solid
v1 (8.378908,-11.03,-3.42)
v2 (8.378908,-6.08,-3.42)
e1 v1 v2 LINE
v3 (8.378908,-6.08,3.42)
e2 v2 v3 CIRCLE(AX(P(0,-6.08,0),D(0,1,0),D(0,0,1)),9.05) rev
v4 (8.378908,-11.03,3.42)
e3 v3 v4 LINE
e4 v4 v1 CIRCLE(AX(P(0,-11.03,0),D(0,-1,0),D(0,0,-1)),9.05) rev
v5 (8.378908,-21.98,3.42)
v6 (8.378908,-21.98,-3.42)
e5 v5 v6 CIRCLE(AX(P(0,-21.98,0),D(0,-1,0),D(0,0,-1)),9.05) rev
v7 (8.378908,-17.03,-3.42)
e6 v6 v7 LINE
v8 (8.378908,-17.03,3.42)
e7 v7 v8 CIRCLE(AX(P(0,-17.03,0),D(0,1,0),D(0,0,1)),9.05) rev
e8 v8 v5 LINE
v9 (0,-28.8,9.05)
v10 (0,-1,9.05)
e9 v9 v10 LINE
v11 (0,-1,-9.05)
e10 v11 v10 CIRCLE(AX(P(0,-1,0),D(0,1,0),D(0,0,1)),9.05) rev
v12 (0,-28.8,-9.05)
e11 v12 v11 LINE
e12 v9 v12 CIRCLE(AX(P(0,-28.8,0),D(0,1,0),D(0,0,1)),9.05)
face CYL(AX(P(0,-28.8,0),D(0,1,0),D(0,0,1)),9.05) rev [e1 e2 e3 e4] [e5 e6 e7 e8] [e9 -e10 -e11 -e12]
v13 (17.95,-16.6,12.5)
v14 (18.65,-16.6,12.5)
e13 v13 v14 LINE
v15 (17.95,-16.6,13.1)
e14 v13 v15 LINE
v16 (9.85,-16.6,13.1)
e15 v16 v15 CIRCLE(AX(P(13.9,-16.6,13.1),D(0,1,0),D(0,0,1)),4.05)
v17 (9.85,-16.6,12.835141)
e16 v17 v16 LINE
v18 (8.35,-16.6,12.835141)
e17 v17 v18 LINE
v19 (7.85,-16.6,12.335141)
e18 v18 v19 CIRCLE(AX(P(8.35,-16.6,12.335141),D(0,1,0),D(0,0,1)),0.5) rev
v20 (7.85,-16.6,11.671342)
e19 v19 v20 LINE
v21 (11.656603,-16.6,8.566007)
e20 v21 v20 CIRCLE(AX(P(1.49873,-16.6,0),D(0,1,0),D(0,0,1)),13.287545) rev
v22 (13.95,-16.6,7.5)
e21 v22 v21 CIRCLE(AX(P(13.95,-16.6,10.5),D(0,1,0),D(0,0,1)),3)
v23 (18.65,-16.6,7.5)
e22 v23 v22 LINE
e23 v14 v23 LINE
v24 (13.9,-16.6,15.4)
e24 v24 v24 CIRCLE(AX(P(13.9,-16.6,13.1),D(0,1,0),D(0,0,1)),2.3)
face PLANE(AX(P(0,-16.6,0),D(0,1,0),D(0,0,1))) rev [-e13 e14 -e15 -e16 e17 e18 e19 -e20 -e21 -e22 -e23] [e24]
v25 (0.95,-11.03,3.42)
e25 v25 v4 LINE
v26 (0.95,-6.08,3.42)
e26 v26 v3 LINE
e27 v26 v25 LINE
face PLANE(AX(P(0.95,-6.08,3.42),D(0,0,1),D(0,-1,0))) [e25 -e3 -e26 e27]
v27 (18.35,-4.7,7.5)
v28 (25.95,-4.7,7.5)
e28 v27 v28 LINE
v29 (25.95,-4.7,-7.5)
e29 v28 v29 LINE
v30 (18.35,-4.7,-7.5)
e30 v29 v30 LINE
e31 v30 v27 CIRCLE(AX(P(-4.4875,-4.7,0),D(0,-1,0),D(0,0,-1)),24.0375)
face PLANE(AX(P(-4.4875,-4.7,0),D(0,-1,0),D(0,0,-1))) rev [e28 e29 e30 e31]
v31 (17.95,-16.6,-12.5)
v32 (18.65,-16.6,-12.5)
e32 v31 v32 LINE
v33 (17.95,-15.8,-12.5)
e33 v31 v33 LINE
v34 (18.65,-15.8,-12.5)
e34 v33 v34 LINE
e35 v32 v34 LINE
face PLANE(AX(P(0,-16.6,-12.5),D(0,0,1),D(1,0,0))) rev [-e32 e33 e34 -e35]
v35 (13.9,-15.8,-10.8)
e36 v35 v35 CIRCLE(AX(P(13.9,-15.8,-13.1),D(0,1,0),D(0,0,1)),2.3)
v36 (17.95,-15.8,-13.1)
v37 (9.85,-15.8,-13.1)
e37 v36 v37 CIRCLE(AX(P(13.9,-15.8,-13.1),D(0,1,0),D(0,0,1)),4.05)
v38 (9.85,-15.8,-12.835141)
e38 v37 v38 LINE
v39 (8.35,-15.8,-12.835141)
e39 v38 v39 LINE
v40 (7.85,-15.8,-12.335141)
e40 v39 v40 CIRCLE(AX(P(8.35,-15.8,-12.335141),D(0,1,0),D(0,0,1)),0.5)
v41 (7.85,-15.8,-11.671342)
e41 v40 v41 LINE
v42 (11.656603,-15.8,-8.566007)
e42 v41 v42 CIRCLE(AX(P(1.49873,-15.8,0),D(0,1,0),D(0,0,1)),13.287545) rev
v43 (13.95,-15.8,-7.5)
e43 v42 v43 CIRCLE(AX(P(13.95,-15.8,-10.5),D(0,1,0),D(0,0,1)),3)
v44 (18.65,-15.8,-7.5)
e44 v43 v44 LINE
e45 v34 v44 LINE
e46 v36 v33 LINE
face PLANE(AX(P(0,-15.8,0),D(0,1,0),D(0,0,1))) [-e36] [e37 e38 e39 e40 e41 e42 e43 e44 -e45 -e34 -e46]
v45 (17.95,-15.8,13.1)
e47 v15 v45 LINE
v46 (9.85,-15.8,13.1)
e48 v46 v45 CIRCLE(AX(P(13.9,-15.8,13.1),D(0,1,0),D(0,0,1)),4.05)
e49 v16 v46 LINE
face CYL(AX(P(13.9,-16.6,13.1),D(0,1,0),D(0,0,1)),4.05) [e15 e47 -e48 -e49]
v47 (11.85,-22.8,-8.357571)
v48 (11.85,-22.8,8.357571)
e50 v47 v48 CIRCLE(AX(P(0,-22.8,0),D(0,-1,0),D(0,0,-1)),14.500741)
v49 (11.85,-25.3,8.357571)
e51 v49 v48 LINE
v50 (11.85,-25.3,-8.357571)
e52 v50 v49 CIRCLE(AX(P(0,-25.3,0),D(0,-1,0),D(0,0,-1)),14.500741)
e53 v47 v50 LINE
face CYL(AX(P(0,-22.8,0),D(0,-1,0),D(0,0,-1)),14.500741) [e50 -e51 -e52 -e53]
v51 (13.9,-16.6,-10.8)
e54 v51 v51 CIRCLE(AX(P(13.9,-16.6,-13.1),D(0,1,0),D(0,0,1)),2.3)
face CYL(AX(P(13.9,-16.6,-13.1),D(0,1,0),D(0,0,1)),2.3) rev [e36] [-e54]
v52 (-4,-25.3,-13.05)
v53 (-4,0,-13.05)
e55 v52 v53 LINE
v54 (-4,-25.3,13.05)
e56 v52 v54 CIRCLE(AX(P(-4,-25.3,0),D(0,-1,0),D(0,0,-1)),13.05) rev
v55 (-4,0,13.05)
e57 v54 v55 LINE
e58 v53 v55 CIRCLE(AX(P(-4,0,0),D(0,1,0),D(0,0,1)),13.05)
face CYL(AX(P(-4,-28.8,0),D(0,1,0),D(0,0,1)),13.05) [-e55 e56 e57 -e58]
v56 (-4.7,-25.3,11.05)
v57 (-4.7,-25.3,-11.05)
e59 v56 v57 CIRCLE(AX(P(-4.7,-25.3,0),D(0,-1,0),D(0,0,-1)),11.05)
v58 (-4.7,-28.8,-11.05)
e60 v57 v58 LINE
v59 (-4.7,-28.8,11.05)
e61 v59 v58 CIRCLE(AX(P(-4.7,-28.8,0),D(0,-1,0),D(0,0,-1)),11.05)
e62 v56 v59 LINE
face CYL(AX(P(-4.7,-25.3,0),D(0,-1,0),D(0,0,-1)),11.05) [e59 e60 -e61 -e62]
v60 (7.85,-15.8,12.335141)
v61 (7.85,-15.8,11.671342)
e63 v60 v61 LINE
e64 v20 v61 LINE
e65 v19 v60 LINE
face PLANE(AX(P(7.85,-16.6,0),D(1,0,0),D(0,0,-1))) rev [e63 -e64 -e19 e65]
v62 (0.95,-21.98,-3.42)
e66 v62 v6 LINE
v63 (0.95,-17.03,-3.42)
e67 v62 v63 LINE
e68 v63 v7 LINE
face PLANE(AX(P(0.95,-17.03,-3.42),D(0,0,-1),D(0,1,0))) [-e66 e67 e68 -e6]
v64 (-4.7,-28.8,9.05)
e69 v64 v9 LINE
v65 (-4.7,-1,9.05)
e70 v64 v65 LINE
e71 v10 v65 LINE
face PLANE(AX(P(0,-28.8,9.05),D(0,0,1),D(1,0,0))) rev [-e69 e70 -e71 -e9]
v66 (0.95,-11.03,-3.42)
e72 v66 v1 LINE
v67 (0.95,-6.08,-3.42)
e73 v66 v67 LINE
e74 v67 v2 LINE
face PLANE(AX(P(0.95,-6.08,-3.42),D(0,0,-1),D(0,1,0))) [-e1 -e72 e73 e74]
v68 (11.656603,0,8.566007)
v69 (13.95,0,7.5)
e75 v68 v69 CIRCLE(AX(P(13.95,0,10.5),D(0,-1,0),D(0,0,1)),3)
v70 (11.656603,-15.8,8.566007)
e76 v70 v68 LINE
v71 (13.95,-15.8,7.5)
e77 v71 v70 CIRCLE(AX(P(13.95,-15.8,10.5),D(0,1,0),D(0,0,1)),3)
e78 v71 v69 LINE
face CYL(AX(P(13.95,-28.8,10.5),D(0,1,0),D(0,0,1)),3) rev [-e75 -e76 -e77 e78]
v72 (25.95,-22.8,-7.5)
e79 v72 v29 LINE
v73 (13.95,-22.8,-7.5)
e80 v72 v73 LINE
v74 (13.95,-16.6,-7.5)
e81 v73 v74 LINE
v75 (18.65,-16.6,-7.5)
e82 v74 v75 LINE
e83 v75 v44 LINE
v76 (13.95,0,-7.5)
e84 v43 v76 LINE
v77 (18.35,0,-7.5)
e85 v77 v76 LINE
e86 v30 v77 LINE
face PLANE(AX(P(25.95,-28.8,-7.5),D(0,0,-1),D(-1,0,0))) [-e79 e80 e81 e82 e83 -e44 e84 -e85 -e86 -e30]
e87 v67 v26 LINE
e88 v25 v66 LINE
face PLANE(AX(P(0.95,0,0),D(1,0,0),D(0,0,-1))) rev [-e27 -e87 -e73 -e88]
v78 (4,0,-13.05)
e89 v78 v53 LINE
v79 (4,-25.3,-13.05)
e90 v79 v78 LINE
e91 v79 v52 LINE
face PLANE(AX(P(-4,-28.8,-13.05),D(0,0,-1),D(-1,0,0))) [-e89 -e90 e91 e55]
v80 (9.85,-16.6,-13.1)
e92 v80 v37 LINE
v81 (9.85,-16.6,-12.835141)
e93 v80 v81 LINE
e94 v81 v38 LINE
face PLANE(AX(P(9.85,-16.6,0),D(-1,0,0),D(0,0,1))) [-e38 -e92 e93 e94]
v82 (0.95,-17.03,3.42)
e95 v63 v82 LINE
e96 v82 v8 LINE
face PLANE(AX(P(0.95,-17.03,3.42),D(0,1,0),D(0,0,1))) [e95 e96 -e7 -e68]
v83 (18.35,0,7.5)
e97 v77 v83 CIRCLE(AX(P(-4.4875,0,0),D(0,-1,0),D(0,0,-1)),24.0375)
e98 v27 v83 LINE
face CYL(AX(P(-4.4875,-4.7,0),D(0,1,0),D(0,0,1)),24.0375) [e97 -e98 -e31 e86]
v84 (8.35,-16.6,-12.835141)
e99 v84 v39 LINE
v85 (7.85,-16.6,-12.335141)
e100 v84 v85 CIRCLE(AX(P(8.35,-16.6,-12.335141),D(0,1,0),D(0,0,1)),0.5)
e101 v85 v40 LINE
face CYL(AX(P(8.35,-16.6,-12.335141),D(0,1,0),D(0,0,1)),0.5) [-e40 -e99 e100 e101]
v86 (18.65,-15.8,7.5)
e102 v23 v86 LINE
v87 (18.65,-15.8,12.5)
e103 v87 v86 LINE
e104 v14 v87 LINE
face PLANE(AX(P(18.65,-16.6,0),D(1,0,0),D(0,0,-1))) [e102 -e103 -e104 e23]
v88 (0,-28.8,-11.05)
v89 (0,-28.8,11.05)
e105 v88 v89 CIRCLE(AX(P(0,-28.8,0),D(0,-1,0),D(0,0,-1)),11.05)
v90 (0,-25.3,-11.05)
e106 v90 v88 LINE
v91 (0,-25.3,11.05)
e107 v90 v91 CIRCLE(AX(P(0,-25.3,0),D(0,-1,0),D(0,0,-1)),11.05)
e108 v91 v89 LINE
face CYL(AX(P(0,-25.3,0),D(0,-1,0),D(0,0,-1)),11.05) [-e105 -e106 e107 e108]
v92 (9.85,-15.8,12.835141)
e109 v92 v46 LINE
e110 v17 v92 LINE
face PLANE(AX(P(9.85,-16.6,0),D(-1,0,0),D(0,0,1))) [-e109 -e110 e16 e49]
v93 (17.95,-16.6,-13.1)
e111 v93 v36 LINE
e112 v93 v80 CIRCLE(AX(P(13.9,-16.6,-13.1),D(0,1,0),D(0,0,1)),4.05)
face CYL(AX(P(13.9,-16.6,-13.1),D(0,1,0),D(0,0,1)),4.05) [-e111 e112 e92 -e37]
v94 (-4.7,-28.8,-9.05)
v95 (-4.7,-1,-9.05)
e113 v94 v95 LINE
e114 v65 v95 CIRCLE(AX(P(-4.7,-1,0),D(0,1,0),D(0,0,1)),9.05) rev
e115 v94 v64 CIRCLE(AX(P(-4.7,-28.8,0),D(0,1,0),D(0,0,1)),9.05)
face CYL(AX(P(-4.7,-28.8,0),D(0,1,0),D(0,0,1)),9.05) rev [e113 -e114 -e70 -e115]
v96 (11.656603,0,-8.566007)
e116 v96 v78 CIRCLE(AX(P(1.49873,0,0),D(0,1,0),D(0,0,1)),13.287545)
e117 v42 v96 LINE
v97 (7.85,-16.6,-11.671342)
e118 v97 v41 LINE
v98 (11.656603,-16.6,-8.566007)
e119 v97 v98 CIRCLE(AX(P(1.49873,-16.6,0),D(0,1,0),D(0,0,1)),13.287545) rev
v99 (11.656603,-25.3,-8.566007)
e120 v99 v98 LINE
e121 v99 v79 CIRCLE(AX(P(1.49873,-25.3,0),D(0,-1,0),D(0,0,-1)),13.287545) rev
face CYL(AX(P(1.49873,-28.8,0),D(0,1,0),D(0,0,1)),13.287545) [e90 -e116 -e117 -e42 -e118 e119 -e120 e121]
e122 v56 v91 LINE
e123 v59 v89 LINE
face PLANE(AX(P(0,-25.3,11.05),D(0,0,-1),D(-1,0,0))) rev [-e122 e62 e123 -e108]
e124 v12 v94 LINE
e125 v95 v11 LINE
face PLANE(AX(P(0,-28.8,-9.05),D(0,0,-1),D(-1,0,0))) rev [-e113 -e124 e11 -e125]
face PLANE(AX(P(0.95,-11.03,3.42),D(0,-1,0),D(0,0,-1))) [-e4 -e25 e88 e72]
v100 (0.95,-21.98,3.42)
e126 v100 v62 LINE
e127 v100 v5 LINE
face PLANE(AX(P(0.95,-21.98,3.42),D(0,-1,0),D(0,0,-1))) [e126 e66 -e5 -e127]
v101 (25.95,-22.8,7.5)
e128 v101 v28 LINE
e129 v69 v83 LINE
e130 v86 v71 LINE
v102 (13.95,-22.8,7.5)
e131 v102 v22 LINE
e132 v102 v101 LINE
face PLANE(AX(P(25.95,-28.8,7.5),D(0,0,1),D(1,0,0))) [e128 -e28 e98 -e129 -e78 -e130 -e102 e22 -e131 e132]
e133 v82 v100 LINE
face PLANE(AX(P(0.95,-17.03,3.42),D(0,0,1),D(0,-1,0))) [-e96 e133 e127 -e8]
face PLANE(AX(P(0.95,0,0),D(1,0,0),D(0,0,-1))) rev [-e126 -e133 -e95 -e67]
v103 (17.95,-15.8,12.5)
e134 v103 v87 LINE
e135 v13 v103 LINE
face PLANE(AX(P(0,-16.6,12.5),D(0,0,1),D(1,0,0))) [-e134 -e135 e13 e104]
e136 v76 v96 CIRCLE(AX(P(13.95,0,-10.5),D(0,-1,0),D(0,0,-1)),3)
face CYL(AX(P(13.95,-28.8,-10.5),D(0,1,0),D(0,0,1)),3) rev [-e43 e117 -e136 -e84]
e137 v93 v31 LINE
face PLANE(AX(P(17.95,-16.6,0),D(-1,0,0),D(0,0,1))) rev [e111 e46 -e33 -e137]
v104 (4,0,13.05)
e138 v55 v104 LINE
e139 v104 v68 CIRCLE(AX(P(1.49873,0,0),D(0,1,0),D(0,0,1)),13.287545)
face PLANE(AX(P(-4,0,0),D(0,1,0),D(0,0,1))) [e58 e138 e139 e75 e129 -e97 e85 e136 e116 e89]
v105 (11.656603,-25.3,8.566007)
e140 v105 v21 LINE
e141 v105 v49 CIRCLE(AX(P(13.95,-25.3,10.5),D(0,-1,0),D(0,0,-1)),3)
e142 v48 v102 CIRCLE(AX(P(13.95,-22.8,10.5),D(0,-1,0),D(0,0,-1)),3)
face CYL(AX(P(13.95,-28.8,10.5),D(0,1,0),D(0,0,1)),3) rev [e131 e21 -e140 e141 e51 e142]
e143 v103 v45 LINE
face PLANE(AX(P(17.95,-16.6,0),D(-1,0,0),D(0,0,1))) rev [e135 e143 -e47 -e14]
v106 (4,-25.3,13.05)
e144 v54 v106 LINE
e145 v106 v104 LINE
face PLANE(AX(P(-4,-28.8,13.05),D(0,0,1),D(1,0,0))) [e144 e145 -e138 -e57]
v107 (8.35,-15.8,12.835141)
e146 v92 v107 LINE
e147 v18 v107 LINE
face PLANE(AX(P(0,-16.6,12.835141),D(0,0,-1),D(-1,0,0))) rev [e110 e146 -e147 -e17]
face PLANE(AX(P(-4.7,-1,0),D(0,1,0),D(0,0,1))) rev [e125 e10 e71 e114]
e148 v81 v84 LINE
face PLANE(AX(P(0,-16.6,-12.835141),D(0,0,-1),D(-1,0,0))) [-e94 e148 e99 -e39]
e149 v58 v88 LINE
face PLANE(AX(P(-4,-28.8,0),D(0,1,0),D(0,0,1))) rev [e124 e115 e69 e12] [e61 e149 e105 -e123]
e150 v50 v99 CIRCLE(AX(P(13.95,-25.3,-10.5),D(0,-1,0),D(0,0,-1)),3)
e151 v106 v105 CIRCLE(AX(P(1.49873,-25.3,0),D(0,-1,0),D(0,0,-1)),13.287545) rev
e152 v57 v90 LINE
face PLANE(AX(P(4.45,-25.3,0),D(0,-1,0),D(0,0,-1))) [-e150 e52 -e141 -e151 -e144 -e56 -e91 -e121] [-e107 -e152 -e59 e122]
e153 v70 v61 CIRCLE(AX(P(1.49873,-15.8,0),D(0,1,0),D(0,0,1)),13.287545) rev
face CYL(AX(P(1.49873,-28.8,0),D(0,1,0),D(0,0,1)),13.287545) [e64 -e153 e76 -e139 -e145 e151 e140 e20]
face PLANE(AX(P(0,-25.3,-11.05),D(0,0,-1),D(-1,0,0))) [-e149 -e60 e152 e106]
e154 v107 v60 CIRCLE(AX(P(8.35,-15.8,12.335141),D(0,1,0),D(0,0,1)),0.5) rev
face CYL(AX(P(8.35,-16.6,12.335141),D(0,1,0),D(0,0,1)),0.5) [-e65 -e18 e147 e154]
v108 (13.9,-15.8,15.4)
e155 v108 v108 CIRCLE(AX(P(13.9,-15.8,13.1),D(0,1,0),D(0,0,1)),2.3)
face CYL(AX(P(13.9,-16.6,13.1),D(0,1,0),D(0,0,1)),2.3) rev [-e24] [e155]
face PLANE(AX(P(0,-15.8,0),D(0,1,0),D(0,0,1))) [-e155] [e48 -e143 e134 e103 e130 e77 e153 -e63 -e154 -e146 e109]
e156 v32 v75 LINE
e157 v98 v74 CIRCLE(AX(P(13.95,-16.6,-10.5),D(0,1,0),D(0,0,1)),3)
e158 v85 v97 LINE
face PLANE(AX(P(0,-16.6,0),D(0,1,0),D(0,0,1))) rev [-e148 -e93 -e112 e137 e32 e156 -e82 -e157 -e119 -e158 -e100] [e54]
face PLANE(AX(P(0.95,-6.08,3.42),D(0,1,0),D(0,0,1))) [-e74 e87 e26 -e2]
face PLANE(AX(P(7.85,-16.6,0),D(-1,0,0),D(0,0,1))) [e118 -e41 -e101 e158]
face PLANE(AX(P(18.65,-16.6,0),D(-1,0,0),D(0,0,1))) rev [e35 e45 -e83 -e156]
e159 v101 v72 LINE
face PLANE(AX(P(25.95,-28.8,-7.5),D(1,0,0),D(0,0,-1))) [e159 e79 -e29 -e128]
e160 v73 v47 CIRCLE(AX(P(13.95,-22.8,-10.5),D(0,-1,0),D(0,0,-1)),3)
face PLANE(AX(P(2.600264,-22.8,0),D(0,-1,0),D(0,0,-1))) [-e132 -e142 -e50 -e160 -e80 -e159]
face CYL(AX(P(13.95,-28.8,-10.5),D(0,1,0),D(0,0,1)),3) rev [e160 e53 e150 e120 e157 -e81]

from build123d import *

# Parameters (mm, degrees)
BOSS_EXTRUDE1_DEPTH = 28.8
CUT_EXTRUDE1_DEPTH  = 41.90409515
BOSS_EXTRUDE3_DEPTH = 1
CUT_EXTRUDE2_DEPTH  = 4.7
SKETCH4_R           = 2.3
BOSS_EXTRUDE2_DEPTH = 0.8
SKETCH5_OUTSIDE_W   = 57.418
SKETCH5_OUTSIDE_H   = 48.718
CUT_EXTRUDE3_DEPTH  = 3.5
SKETCH6_OUTSIDE_W   = 57.418
SKETCH6_OUTSIDE_H   = 48.718
CUT_EXTRUDE4_DEPTH  = 2.5
SKETCH8_W           = 6.84
SKETCH8_H           = 4.95
BOSS_EXTRUDE4_DEPTH = 25


with BuildPart() as part:
    # Sketch1 → Boss-Extrude1 (new body)
    with BuildSketch(Plane(origin=(0, 0, 0), x_dir=(1, 0, 0), z_dir=(0, 1, 0))):
        with BuildLine():
            Line((-4, 13.05), (4, 13.05))
            ThreePointArc((4, 13.05), (8.213640499, 11.465985784), (11.656602829, 8.566006872))
            ThreePointArc((11.656602829, 8.566006872), (12.685480206, 7.779523995), (13.95, 7.5))
            Line((13.95, 7.5), (25.95, 7.5))
            Line((25.95, 7.5), (25.95, -7.5))
            Line((25.95, -7.5), (13.95, -7.5))
            ThreePointArc((13.95, -7.5), (12.685480206, -7.779523995), (11.656602829, -8.566006872))
            ThreePointArc((11.656602829, -8.566006872), (8.213640499, -11.465985784), (4, -13.05))
            Line((4, -13.05), (-4, -13.05))
            ThreePointArc((-4, -13.05), (-17.05, 0), (-4, 13.05))
        make_face()
    extrude(amount=-BOSS_EXTRUDE1_DEPTH)

    # Sketch2 → Cut-Extrude1 (cut, through all)
    with BuildSketch(Plane(origin=(0, 0, 0), x_dir=(1, 0, 0), z_dir=(0, 1, 0))):
        with BuildLine():
            Line((0, -9.05), (-4.7, -9.05))
            ThreePointArc((-4.7, -9.05), (-13.75, 0), (-4.7, 9.05))
            Line((-4.7, 9.05), (0, 9.05))
            ThreePointArc((0, 9.05), (9.05, 0), (0, -9.05))
        make_face()
    extrude(amount=-CUT_EXTRUDE1_DEPTH, mode=Mode.SUBTRACT)

    # Sketch7 → Boss-Extrude3 (add)
    with BuildSketch(Plane(origin=(0, 0, 0), x_dir=(1, 0, 0), z_dir=(0, 1, 0))):
        with BuildLine():
            Line((-4.7, 10.05), (0, 10.05))
            ThreePointArc((0, 10.05), (10.05, 0), (0, -10.05))
            Line((0, -10.05), (-4.7, -10.05))
            ThreePointArc((-4.7, -10.05), (-14.75, 0), (-4.7, 10.05))
        make_face()
    extrude(amount=-BOSS_EXTRUDE3_DEPTH)

    # Sketch3 → Cut-Extrude2 (cut)
    with BuildSketch(Plane(origin=(0, 0, 0), x_dir=(1, 0, 0), z_dir=(0, 1, 0))):
        with BuildLine():
            Line((25.95, 7.5), (18.35, 7.5))
            ThreePointArc((18.35, 7.5), (19.55, 0), (18.35, -7.5))
            Line((18.35, -7.5), (25.95, -7.5))
            Line((25.95, -7.5), (25.95, 7.5))
        make_face()
    extrude(amount=-CUT_EXTRUDE2_DEPTH, mode=Mode.SUBTRACT)

    # Sketch4 → Boss-Extrude2 (add)
    with BuildSketch(Plane(origin=(0, -15.8, 0), x_dir=(1, 0, 0), z_dir=(0, 1, 0))):
        with BuildLine():
            Line((17.95, 12.5), (17.95, 13.1))
            ThreePointArc((17.95, 13.1), (13.9, 17.15), (9.85, 13.1))
            Line((9.85, 13.1), (9.85, 12.835141167))
            Line((9.85, 12.835141167), (8.35, 12.835141167))
            ThreePointArc((8.35, 12.835141167), (7.996446609, 12.688694558), (7.85, 12.335141167))
            Line((7.85, 12.335141167), (7.85, 10.106704765))
            Line((7.85, 10.106704765), (9.85, 10.106704765))
            Line((9.85, 10.106704765), (9.85, -10.106704765))
            Line((9.85, -10.106704765), (7.85, -10.106704765))
            Line((7.85, -10.106704765), (7.85, -12.335141167))
            ThreePointArc((7.85, -12.335141167), (7.996446609, -12.688694558), (8.35, -12.835141167))
            Line((8.35, -12.835141167), (9.85, -12.835141167))
            Line((9.85, -12.835141167), (9.85, -13.1))
            ThreePointArc((9.85, -13.1), (13.9, -17.15), (17.95, -13.1))
            Line((17.95, -13.1), (17.95, -12.5))
            Line((17.95, -12.5), (18.65, -12.5))
            Line((18.65, -12.5), (18.65, -6.668963251))
            Line((18.65, -6.668963251), (17.95, -6.668963251))
            Line((17.95, -6.668963251), (17.95, 6.668963251))
            Line((17.95, 6.668963251), (18.65, 6.668963251))
            Line((18.65, 6.668963251), (18.65, 12.5))
            Line((18.65, 12.5), (17.95, 12.5))
        make_face()
        with Locations((13.9, -13.1)):
            Circle(SKETCH4_R, mode=Mode.SUBTRACT)
        with Locations((13.9, 13.1)):
            Circle(SKETCH4_R, mode=Mode.SUBTRACT)
    extrude(amount=-BOSS_EXTRUDE2_DEPTH)

    # Sketch5 outside → Cut-Extrude3 (cut)
    # profile 1 of 2: a face of its own
    with BuildSketch(Plane.XZ.offset(28.8)):
        with Locations((4.45, 0)):
            Rectangle(SKETCH5_OUTSIDE_W, SKETCH5_OUTSIDE_H)
        with BuildLine():
            Line((0, 11.05), (-4.7, 11.05))
            ThreePointArc((-4.7, 11.05), (-15.75, 0), (-4.7, -11.05))
            Line((-4.7, -11.05), (0, -11.05))
            ThreePointArc((0, -11.05), (11.05, 0), (0, 11.05))
        make_face(mode=Mode.SUBTRACT)
    # profile 2 of 2: a face of its own
    with BuildSketch(Plane.XZ.offset(28.8)):
        with BuildLine():
            Line((-4.7, 9.05), (0, 9.05))
            ThreePointArc((0, 9.05), (9.05, 0), (0, -9.05))
            Line((0, -9.05), (-4.7, -9.05))
            ThreePointArc((-4.7, -9.05), (-13.75, 0), (-4.7, 9.05))
        make_face()
    extrude(amount=-CUT_EXTRUDE3_DEPTH, mode=Mode.SUBTRACT)

    # Sketch6 outside → Cut-Extrude4 (cut)
    with BuildSketch(Plane.XZ.offset(25.3)):
        with Locations((4.45, 0)):
            Rectangle(SKETCH6_OUTSIDE_W, SKETCH6_OUTSIDE_H)
        with BuildLine():
            Line((-0.915214063, 14.471830711), (-20.749472671, 14.471830711))
            Line((-20.749472671, 14.471830711), (-20.749472671, -14.500741391))
            Line((-20.749472671, -14.500741391), (0, -14.500741391))
            ThreePointArc((0, -14.500741391), (14.493511919, 0.457835289), (-0.915214063, 14.471830711))
        make_face(mode=Mode.SUBTRACT)
    extrude(amount=-CUT_EXTRUDE4_DEPTH, mode=Mode.SUBTRACT)

    # Sketch8 → Boss-Extrude4 (add)
    with BuildSketch(Plane(origin=(25.95, 0, 0), x_dir=(0, 0, -1), z_dir=(1, 0, 0))):
        with Locations((0, -19.505)):
            Rectangle(SKETCH8_W, SKETCH8_H)
        with Locations((0, -8.555)):
            Rectangle(SKETCH8_W, SKETCH8_H)
    extrude(amount=-BOSS_EXTRUDE4_DEPTH)


solid = part.part
